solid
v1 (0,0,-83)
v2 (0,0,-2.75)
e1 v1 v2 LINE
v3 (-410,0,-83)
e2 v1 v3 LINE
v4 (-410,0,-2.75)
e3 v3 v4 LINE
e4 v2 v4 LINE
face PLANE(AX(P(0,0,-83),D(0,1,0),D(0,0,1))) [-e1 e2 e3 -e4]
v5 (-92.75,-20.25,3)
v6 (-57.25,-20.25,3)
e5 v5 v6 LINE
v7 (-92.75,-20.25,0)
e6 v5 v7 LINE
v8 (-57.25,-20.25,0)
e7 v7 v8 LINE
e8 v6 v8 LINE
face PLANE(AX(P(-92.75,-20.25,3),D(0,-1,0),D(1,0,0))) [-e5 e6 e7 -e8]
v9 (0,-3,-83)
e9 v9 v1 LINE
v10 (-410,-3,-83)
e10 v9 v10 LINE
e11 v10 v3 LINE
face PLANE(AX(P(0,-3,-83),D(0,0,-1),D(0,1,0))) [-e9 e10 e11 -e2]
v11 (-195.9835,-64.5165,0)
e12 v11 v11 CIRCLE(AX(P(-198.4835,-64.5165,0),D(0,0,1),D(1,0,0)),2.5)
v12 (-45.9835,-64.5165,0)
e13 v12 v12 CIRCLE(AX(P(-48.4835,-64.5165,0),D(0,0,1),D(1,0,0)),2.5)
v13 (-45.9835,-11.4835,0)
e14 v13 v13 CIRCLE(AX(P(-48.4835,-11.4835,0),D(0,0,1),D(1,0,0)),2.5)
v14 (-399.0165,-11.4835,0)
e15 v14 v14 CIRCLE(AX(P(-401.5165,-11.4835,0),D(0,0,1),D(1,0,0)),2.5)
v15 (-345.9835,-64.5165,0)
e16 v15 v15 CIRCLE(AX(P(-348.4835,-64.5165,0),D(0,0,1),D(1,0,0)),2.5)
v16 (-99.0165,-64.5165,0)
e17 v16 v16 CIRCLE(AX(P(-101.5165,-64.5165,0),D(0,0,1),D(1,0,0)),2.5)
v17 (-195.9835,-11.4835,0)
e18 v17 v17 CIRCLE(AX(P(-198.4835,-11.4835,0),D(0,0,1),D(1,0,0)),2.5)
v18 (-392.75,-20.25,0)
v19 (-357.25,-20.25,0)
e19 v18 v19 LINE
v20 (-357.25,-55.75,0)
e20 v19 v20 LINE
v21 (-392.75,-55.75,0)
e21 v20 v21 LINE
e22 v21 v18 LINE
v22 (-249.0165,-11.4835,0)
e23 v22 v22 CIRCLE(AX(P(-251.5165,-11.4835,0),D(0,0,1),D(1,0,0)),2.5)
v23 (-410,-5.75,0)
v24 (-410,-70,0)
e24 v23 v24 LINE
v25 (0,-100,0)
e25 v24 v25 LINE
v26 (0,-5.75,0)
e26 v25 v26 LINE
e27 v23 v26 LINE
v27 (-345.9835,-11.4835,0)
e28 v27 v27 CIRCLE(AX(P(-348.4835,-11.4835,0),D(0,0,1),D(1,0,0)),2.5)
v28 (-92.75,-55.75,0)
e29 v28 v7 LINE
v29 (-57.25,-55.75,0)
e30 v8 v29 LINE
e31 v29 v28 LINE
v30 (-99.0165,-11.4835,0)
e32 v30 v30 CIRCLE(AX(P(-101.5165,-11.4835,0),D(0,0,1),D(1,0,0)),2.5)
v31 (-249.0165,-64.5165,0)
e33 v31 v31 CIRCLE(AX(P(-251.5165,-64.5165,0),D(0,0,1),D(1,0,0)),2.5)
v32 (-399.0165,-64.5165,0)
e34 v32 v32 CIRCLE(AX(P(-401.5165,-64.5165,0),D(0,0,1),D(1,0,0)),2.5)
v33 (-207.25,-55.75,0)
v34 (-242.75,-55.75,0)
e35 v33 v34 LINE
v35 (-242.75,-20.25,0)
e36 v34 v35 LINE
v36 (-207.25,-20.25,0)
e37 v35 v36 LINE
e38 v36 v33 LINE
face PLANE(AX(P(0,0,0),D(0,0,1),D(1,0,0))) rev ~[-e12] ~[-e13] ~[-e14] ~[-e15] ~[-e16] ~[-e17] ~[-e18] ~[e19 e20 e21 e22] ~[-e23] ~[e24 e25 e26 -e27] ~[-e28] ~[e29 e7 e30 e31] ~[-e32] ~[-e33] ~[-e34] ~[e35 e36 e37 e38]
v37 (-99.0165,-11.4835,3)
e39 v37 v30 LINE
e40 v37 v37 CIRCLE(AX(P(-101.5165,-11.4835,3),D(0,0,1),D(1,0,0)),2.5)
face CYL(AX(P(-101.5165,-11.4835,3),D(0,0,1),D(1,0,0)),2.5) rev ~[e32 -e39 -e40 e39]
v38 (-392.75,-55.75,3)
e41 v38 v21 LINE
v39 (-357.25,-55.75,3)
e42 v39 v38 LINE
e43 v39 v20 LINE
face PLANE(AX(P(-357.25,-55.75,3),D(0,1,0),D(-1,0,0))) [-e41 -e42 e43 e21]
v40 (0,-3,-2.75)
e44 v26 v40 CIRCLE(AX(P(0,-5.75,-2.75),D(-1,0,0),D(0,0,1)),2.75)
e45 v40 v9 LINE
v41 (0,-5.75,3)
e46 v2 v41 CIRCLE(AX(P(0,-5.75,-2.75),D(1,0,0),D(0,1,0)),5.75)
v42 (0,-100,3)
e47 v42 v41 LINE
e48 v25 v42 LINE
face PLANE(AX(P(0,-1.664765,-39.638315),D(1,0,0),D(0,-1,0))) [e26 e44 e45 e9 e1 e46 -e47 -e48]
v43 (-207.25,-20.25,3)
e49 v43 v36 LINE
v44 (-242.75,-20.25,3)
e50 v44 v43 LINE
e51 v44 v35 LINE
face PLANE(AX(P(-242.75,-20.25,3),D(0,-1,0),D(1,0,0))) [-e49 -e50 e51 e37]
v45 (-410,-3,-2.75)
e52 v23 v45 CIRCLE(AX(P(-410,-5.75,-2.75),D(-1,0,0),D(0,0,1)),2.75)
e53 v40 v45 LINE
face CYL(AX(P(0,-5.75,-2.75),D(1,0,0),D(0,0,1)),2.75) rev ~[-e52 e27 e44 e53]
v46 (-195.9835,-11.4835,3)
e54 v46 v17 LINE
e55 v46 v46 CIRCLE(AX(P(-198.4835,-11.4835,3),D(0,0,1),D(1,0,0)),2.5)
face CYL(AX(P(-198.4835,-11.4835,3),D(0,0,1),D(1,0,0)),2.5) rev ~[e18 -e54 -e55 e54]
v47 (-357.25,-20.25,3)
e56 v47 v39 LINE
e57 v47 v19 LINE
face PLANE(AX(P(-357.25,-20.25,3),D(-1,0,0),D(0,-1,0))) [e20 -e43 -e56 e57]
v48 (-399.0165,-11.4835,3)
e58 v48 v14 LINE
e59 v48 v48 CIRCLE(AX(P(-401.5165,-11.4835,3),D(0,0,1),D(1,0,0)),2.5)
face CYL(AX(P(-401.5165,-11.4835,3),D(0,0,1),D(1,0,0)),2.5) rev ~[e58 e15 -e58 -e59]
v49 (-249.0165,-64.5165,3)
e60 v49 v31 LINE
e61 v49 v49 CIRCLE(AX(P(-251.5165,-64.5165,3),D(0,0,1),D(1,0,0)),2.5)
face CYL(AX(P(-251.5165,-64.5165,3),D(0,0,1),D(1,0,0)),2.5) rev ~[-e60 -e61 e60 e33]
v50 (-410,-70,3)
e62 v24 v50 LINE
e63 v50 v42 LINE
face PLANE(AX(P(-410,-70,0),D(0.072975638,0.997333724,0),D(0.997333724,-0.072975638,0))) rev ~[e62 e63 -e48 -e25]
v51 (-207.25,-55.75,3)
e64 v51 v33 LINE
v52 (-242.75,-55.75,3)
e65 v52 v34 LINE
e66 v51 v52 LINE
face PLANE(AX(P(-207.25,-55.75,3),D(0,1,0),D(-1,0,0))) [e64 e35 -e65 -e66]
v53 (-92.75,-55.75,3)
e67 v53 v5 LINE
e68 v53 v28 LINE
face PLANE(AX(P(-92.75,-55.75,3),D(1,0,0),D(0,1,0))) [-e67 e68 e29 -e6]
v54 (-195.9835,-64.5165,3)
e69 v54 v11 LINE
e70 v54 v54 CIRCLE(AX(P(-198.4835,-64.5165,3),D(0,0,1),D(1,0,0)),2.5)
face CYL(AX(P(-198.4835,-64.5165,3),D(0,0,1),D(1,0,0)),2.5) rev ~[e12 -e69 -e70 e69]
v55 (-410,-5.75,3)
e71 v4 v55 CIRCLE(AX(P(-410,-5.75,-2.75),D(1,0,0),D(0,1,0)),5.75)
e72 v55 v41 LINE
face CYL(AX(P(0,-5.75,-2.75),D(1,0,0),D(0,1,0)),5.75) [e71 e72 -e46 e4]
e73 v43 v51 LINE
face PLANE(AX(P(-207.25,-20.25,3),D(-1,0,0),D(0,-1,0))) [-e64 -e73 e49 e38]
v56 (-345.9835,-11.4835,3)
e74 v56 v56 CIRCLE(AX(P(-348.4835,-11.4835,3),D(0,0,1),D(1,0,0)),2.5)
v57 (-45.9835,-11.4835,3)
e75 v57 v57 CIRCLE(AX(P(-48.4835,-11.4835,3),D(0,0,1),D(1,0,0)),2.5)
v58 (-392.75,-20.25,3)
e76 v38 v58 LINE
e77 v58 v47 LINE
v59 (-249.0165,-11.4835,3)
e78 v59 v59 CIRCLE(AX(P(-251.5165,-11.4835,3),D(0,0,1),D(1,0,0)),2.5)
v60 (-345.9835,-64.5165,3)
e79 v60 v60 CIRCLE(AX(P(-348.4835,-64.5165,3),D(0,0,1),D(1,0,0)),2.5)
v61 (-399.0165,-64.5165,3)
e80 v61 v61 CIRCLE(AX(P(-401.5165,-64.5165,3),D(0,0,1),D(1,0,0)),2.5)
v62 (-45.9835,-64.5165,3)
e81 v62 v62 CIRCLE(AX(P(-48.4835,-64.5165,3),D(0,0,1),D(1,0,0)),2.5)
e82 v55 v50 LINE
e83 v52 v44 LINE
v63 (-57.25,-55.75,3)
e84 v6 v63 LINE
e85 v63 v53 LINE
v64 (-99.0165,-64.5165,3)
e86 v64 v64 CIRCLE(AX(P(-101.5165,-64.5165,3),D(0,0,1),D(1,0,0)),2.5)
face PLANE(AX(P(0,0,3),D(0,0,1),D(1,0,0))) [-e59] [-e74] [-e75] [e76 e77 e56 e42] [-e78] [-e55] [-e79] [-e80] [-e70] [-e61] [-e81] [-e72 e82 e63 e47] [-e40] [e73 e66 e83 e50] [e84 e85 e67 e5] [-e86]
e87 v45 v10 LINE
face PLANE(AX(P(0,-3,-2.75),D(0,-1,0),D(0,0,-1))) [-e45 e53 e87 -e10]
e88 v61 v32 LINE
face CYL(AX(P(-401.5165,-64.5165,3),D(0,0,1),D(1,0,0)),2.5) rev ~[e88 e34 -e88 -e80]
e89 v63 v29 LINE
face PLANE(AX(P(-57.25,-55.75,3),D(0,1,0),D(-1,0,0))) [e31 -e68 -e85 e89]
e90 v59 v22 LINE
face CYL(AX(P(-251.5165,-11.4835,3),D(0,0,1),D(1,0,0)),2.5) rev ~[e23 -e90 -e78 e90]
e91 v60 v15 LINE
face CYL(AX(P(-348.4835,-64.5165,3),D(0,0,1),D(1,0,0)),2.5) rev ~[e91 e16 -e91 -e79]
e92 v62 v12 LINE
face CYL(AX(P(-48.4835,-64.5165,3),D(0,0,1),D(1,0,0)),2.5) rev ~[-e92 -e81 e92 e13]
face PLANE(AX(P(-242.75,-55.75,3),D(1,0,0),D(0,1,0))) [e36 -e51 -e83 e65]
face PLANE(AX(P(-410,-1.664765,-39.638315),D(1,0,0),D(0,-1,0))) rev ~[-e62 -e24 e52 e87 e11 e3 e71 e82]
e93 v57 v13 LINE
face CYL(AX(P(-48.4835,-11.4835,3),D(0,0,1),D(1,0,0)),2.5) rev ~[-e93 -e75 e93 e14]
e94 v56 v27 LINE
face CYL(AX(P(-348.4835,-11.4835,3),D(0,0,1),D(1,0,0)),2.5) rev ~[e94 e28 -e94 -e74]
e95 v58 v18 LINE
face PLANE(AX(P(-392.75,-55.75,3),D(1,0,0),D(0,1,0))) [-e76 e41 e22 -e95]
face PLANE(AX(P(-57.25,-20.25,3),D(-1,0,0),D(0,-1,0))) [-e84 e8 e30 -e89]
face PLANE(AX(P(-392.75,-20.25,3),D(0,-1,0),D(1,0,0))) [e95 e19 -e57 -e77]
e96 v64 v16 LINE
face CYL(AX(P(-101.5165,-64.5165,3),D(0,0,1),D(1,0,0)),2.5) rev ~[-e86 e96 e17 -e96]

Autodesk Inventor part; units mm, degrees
ref_plane "YZ Plane" through (0, 0, 0) normal (1, 0, 0) x (0, 1, 0)
ref_plane "XZ Plane" through (0, 0, 0) normal (0, 1, 0) x (-1, 0, 0)
ref_plane "XY Plane" through (0, 0, 0) normal (0, 0, 1) x (1, 0, 0)
sketch "Sketch1" plane through (0, 0, 0) normal (0, 0, 1) x (1, 0, 0)
  line L0 (0, 0) -> (-410, 0)
  line L1 (0, -100) -> (0, 0)
  line L2 (-410, 0) -> (-410, -70)
  line L3 (-410, -70) -> (0, -100)
  point P0 (0, -50)
  dimension "d32" = 100
  dimension "d60" = 70
  dimension "d61" = 410
extrude "Plate1" add sketch "Sketch1" along normal blind 3
sketch "Sketch8" plane through (0, 0, 3) normal (0, 0, 1) x (1, 0, 0)
  line L0 (-57.25, -55.75) -> (-92.75, -55.75)
  line L1 (-92.75, -55.75) -> (-92.75, -20.25)
  line L2 (-92.75, -20.25) -> (-57.25, -20.25)
  line L3 (-57.25, -20.25) -> (-57.25, -55.75)
  line L4 (-57.25, -55.75) -> (-92.75, -20.25) construction
  line L5 (-92.75, -55.75) -> (-57.25, -20.25) construction
  circle A0 centre (-48.4835, -64.5165) radius 2.5
  circle A1 centre (-101.5165, -64.5165) radius 2.5
  circle A2 centre (-101.5165, -11.4835) radius 2.5
  circle A3 centre (-48.4835, -11.4835) radius 2.5
  circle A4 centre (-75, -38) radius 37.5 construction
  line L6 (0, 0) -> (0, -100) projected
  line L7 (-410, 0) -> (0, 0) projected
  line L8 (-92.75, -55.75) -> (-101.5165, -64.5165) construction
  dimension "d51" = 35.5
  dimension "d52" = 35.5
  dimension "d53" = 5
  dimension "d72" = 75
  dimension "d73" = 38
  dimension "d74" = 12.3977
  dimension "d75" = 75
extrude "Cut3" cut sketch "Sketch8" against normal blind 3
pattern_linear "Rectangular Pattern1" count 3 spacing 150 along (-1, 0, 0) of "Cut3"
sketch "Sketch9" plane through (0, -3, 3) normal (0, 1, 0) x (-1, 0, 0)
  line L0 (410, 0) -> (0, 0)
  line L1 (0, 0) -> (0, -86)
  line L2 (0, -86) -> (410, -86)
  line L3 (410, -86) -> (410, 0)
edge flange "Flange3" height 86 angle 90 thickness 3 bend radius 2.75 thickness toward (0, 1, 0) relief round relief width 3 relief depth 1.5 edges at (-205, 0, 0) wall of the first edge with corners at (-410, -3, 3) (0, -3, 3) (0, -3, -83) (-410, -3, -83)
bend "Bend3"
corner "Corner3"
equation "\"d32\" = Main_way_hight"
equation "\"d61\" = Main_way_lenth"
equation "\"d51\" = d52"
equation "\"d55\" = Thickness"
equation "\"d2\" = Thickness"
equation "\"d62\" = BendReliefWidth"
equation "\"d63\" = BendReliefDepth"
equation "\"d64\" = MinimumRemnant"
equation "\"d65\" = TransitionRadius"
equation "\"d66\" = MAIN_7_central_window_width + 2 * Thickness"
equation "\"d68\" = BendRadius"
equation "\"d69\" = CornerReliefSize"
equation "\"d70\" = GapSize"
equation "\"d71\" = JacobiRadiusSize"
equation "\"BendReliefWidth\" = Thickness"
equation "\"BendReliefDepth\" = 0.5 * Thickness"
equation "\"CornerReliefSize\" = 4 * Thickness"
equation "\"MinimumRemnant\" = 2 * Thickness"
equation "\"TransitionRadius\" = BendRadius"
equation "\"JacobiRadiusSize\" = BendRadius"
equation "\"GapSize\" = Thickness"
equation "\"Main_way_hight\" = 100"
equation "\"Main_way_lenth\" = 410"
equation "\"Thickness\" = 3"
equation "\"MAIN_7_central_window_width\" = 80"
equation "\"BendRadius\" = 2.75"
properties part number "ANP 1422 BOTTOM FDS diameter way up" material "Stainless Steel"
